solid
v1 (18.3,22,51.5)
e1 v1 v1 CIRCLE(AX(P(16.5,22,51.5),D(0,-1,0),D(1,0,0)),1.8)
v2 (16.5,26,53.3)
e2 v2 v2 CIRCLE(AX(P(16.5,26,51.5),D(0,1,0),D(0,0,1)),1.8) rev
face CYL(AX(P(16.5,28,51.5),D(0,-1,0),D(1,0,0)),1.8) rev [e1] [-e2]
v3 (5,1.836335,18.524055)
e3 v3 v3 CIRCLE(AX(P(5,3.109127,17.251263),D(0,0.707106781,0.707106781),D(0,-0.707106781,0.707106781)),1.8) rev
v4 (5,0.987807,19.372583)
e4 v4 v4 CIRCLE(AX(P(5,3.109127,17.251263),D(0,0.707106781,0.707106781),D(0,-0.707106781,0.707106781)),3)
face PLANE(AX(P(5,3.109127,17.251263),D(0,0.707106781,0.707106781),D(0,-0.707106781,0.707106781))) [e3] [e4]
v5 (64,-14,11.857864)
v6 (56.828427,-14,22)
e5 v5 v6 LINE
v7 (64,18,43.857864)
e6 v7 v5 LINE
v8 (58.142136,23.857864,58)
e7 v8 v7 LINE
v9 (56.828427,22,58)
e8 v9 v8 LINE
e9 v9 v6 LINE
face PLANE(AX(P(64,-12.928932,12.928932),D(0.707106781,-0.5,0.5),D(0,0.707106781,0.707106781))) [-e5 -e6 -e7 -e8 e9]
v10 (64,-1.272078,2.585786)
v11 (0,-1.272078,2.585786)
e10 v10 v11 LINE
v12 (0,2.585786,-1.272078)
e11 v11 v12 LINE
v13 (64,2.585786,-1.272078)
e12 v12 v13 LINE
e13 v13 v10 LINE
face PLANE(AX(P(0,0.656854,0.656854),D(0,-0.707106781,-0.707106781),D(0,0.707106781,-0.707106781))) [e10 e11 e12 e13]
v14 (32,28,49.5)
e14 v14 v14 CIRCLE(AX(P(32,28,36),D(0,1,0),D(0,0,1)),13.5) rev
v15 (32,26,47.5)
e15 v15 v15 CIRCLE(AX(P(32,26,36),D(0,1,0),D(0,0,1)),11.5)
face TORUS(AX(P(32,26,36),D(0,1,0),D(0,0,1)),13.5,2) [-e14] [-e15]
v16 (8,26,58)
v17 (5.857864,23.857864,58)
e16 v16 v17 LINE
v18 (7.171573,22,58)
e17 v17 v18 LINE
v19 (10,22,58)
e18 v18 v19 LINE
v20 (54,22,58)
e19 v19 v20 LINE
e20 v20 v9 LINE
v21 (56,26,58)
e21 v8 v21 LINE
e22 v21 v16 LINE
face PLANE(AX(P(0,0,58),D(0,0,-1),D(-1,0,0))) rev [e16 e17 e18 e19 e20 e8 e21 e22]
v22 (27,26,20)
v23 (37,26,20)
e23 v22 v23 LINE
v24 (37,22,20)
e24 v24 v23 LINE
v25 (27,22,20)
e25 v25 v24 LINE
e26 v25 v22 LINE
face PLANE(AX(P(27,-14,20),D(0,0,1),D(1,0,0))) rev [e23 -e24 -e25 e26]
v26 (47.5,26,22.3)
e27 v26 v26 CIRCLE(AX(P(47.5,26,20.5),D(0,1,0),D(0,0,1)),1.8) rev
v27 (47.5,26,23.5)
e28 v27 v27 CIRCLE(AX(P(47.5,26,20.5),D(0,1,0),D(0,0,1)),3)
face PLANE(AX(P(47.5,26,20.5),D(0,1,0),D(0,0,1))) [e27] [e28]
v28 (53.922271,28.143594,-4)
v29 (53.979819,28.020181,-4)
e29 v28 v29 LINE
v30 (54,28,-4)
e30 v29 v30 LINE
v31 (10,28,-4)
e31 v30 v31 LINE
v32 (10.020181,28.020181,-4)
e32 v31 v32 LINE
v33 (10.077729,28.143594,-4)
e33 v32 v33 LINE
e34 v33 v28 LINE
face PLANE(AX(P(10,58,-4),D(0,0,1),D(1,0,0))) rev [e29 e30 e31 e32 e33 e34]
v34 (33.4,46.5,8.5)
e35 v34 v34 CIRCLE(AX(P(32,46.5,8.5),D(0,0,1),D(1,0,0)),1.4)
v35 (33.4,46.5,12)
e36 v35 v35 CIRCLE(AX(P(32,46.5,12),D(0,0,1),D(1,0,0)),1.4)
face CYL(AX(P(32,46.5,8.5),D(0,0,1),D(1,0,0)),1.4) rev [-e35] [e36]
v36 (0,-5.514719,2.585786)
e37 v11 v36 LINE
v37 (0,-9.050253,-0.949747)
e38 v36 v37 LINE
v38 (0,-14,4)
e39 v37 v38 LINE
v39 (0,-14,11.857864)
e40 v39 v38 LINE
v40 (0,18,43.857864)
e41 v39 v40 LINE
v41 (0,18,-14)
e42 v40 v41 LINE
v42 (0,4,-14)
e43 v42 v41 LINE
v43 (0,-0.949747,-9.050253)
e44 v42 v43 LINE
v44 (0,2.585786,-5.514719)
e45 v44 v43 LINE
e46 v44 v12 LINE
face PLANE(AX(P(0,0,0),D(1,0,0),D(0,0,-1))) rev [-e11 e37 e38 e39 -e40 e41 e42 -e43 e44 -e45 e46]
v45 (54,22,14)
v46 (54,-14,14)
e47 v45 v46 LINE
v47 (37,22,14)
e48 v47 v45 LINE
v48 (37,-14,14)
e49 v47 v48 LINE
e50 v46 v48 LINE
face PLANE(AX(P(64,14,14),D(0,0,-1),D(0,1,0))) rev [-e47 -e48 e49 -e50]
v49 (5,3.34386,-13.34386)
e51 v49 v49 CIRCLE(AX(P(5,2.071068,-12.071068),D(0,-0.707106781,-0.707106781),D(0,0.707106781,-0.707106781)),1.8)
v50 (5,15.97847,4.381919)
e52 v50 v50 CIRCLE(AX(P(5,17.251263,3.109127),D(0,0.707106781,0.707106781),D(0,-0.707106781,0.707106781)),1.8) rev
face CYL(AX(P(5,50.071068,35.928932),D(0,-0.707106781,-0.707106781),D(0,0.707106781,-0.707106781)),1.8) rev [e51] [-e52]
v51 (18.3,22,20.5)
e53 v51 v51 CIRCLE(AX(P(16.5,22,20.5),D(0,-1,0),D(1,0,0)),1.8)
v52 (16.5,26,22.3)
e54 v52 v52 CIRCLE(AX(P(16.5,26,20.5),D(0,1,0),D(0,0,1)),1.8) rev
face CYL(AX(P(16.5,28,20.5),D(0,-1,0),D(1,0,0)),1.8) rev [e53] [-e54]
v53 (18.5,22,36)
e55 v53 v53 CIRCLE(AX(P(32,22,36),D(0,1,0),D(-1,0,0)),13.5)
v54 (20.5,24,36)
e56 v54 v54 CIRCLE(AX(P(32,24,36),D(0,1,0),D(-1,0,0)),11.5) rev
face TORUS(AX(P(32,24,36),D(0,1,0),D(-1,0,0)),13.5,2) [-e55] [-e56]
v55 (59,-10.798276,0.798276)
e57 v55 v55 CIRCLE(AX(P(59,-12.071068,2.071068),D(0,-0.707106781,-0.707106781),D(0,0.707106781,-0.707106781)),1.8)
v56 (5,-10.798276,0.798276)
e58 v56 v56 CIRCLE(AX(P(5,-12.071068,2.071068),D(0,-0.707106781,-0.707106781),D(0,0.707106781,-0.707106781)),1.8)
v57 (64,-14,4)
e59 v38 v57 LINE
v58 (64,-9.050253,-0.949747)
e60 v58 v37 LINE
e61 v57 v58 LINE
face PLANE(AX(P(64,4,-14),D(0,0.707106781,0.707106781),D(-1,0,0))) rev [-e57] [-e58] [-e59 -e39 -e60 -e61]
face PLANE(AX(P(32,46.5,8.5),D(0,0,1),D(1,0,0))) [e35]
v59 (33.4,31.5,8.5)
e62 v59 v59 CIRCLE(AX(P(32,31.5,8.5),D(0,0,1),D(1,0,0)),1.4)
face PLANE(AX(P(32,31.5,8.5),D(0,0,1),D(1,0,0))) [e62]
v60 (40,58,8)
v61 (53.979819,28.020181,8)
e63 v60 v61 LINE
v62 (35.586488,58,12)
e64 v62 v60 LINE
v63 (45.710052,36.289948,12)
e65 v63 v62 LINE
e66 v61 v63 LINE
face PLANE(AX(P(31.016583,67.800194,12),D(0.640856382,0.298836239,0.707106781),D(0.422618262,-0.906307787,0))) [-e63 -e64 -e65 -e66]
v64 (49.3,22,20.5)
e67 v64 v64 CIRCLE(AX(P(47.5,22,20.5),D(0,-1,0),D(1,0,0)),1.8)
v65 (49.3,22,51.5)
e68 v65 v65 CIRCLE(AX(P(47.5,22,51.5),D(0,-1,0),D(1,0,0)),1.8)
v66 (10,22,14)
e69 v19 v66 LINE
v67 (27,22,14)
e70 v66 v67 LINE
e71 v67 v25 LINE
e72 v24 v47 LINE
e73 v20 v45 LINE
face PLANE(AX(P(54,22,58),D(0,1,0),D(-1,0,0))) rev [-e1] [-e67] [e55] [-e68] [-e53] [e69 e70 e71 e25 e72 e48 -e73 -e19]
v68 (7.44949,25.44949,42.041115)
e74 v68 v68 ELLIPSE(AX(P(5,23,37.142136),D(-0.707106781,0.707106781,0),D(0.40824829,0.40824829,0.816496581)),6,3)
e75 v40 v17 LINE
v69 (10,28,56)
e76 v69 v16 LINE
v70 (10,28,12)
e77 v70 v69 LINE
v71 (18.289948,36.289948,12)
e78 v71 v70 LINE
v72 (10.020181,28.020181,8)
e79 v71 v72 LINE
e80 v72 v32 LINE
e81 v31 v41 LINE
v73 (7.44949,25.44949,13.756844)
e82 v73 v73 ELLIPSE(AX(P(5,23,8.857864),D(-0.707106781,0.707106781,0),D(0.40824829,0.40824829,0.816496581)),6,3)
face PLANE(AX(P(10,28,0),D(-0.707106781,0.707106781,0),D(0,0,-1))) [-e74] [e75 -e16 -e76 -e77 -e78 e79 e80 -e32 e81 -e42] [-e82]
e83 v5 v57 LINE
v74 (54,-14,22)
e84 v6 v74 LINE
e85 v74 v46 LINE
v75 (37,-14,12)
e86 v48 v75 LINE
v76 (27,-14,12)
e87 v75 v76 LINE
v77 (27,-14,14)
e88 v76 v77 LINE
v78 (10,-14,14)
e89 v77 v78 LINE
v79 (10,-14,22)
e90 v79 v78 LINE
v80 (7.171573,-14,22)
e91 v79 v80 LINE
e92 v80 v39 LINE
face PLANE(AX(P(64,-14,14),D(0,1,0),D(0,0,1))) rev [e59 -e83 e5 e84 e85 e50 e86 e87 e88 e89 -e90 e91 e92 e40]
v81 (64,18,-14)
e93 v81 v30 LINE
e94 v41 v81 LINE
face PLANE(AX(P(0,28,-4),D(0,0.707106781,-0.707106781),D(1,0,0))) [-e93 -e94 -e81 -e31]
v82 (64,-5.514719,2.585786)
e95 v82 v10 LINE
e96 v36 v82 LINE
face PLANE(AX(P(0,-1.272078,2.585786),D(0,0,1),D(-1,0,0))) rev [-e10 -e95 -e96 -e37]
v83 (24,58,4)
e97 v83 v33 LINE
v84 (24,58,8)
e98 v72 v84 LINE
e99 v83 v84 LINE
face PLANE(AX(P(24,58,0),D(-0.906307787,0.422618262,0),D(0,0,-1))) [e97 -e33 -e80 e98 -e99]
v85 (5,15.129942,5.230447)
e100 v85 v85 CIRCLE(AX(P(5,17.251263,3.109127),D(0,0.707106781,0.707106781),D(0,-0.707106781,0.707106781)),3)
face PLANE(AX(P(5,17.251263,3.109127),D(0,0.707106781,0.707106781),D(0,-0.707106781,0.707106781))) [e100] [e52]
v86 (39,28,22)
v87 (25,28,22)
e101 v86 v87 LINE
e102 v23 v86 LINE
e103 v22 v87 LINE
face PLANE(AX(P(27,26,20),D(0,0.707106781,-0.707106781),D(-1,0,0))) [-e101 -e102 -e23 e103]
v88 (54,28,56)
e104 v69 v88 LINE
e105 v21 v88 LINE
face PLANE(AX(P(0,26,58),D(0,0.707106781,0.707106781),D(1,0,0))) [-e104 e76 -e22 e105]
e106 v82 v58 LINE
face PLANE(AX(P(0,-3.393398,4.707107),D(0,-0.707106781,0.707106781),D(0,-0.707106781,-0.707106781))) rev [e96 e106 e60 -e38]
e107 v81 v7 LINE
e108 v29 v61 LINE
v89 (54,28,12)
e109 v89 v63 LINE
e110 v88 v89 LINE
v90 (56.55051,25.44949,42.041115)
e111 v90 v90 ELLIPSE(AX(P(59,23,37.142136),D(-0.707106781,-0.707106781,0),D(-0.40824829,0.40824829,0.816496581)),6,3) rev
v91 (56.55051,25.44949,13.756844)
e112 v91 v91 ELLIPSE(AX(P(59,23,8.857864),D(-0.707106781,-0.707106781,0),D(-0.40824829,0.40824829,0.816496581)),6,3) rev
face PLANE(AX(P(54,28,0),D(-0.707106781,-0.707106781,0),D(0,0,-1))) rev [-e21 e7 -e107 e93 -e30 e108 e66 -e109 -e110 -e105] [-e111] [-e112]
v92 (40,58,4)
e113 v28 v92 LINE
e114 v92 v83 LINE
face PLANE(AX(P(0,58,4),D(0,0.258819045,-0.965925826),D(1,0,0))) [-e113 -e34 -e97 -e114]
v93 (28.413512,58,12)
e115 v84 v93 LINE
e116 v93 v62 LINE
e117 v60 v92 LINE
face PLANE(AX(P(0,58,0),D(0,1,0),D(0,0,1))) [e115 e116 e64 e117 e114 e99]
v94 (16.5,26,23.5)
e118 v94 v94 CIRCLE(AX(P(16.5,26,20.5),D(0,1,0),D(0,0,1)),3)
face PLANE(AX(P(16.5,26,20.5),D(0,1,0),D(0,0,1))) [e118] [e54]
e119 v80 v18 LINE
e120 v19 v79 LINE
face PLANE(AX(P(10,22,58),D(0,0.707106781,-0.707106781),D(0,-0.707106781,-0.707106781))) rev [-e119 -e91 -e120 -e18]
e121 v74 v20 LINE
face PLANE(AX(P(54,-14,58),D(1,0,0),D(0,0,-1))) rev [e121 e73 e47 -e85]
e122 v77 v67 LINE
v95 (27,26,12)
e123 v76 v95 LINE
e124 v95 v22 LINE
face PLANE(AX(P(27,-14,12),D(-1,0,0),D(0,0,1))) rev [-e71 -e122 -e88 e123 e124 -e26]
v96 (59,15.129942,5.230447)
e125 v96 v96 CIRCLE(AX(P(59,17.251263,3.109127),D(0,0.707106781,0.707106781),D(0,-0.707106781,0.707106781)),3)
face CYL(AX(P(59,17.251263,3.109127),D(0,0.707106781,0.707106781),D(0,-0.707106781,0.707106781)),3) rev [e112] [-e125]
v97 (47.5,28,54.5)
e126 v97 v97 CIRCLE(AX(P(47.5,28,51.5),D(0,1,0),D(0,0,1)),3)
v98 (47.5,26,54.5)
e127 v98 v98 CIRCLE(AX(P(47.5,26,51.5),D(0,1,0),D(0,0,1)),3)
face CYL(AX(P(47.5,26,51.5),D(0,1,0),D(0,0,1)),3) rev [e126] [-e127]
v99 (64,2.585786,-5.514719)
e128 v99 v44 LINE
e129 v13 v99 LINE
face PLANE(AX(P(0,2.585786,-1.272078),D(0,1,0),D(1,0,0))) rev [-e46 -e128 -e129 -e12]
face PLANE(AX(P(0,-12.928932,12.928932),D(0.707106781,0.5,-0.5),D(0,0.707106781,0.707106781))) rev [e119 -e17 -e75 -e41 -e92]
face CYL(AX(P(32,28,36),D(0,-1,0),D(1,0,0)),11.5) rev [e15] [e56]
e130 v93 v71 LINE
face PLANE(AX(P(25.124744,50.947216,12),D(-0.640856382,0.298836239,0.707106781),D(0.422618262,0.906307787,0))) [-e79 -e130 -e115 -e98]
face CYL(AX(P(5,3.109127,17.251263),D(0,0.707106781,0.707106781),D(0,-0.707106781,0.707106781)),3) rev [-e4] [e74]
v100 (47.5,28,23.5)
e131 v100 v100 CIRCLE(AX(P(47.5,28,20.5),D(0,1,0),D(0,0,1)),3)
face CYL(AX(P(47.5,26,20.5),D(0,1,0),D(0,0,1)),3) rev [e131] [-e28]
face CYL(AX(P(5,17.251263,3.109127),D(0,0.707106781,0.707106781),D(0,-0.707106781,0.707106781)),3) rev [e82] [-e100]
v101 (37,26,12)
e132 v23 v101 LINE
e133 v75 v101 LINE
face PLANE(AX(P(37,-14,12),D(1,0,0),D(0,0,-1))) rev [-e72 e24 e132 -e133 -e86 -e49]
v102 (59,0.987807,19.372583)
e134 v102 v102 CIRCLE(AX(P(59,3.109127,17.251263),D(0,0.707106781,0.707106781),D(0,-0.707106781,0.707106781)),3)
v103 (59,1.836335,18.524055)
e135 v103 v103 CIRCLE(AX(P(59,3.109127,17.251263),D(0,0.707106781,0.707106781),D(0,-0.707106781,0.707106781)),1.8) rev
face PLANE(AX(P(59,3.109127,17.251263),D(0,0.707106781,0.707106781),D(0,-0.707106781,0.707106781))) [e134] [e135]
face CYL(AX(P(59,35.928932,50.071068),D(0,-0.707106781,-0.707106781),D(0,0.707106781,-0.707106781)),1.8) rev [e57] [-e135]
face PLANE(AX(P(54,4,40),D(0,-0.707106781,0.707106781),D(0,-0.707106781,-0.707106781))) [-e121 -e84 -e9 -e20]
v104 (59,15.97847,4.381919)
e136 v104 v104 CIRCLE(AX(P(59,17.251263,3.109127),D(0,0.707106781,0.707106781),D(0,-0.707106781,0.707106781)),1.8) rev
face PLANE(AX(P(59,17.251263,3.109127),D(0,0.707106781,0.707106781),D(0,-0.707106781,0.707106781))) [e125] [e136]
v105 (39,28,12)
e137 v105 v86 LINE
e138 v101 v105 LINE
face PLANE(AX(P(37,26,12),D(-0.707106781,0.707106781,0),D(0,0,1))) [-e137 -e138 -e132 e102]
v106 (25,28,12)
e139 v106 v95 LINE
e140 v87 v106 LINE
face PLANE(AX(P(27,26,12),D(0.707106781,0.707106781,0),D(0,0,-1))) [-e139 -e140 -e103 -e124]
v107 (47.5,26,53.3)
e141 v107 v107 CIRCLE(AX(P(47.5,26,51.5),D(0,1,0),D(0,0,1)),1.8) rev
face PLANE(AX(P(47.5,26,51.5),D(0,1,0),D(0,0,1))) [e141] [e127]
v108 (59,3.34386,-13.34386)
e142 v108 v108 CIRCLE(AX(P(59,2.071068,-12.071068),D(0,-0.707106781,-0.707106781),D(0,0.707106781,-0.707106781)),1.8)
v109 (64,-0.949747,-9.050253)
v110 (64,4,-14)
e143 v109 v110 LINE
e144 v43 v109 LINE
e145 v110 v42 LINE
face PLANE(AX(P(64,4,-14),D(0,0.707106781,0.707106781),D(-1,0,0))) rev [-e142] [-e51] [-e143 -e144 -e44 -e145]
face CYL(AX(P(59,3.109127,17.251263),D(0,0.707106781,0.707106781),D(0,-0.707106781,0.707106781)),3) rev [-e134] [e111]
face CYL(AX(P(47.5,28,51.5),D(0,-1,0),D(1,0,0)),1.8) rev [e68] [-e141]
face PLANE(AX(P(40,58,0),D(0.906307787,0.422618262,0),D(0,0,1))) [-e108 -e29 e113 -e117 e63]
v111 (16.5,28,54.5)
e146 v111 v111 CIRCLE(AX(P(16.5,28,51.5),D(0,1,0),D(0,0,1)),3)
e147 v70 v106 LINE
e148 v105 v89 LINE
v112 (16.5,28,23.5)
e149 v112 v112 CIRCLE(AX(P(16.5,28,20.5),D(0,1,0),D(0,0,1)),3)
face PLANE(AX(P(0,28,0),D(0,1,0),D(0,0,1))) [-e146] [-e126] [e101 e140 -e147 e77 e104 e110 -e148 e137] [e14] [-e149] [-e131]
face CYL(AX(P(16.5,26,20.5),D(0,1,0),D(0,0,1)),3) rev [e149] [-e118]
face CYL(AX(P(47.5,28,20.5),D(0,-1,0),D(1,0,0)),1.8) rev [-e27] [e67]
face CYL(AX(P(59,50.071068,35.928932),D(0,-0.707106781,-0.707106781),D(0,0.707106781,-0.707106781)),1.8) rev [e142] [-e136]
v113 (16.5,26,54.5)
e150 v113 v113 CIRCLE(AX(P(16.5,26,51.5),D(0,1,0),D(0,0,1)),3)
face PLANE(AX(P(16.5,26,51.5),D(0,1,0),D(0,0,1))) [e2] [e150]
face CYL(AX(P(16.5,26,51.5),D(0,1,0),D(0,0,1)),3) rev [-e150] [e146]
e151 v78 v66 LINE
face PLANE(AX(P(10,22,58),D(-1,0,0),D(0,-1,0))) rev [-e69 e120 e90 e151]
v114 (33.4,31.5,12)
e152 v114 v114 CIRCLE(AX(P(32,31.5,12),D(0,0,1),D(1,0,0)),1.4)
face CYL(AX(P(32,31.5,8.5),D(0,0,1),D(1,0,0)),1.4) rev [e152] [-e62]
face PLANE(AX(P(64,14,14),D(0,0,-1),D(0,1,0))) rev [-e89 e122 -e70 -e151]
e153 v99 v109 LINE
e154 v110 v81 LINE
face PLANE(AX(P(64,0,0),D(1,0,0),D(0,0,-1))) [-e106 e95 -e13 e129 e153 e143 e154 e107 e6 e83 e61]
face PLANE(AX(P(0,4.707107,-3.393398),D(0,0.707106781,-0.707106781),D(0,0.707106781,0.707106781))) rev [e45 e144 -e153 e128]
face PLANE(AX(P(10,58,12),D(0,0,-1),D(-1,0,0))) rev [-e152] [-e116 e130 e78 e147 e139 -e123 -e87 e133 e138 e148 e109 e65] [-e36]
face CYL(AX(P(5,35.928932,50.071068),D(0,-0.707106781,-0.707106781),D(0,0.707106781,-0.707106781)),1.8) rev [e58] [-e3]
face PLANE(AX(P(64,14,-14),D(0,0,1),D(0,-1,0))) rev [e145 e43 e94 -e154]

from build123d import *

# Parameters (mm, degrees)
SKETCH1_W           = 28
SKETCH1_H           = 28
BOSS_EXTRUDE1_DEPTH = 64
CHAMFER1_SIZE       = 18
SKETCH3_W           = 64
SKETCH3_H           = 28
BOSS_EXTRUDE2_DEPTH = 14
BOSS_EXTRUDE3_DEPTH = 44
CHAMFER2_SIZE       = 32
SKETCH5_R           = 11.5
SKETCH5_R_2         = 1.8
CUT_EXTRUDE1_DEPTH  = 6
CHAMFER3_SIZE       = 2
SKETCH2_R           = 1.8
CUT_EXTRUDE2_DEPTH  = 96.676538399
SKETCH6_R           = 3
CUT_EXTRUDE3_DEPTH  = 45
SKETCH7_R           = 3
CUT_EXTRUDE4_DEPTH  = 2
FILLET1_R           = 2
CHAMFER4_SIZE       = 10
CHAMFER5_SIZE       = 10
CHAMFER6_START      = -29
CHAMFER6_OUTLINE_W  = 4
CHAMFER6_OUTLINE_H  = 54
CHAMFER6_DEPTH      = 3.544155877
CHAMFER7_SIZE       = 10
SKETCH8_W           = 44
SKETCH8_H           = 16
BOSS_EXTRUDE4_DEPTH = 30
SKETCH9_R           = 1.4
CUT_EXTRUDE5_DEPTH  = 3.5
CHAMFER8_SIZE       = 14
CHAMFER8_SIZE_2     = 30.023096887
CHAMFER9_SIZE       = 8
CHAMFER9_SIZE2      = 29.856406461
CHAMFER10_SIZE      = 4
SKETCH11_W          = 10
SKETCH11_H          = 8
CUT_EXTRUDE6_DEPTH  = 97.041657628
CHAMFER11_SIZE      = 2
SKETCH12_W          = 64
SKETCH12_H          = 11.455844122
CUT_EXTRUDE7_DEPTH  = 8
CHAMFER12_SIZE      = 3


with BuildPart() as part:
    # Sketch1 → Boss-Extrude1 (new body)
    with BuildSketch(Plane(origin=(0, 0, 0), x_dir=(0, 0, -1), z_dir=(1, 0, 0))):
        Rectangle(SKETCH1_W, SKETCH1_H)
    extrude(amount=BOSS_EXTRUDE1_DEPTH)

    # Chamfer1
    chamfer1_edges = [part.edges().sort_by_distance(p)[0] for p in [
        (32, -14, -14),
    ]]
    chamfer(chamfer1_edges, length=CHAMFER1_SIZE)

    # Sketch3 → Boss-Extrude2 (add)
    with BuildSketch(Plane(origin=(0, 14, 0), x_dir=(1, 0, 0), z_dir=(0, 1, 0))):
        with Locations((32, 0)):
            Rectangle(SKETCH3_W, SKETCH3_H)
    extrude(amount=BOSS_EXTRUDE2_DEPTH)

    # Sketch4 → Boss-Extrude3 (add)
    with BuildSketch(Plane.XY.offset(14)):
        Polygon((0, -14), (0, 28), (64, 28), (64, -14), (54, -14), (54, 22), (10, 22), (10, -14), align=None)
    extrude(amount=BOSS_EXTRUDE3_DEPTH)

    # Chamfer2
    chamfer2_edges = [part.edges().sort_by_distance(p)[0] for p in [
        (5, -14, 58),
        (59, -14, 58),
    ]]
    chamfer(chamfer2_edges, length=CHAMFER2_SIZE)

    # Sketch5 → Cut-Extrude1 (cut)
    with BuildSketch(Plane(origin=(0, 22, 0), x_dir=(-1, 0, 0), z_dir=(0, -1, 0))):
        with Locations(Location((-32, -36, 0), (0, 0, 180))):
            Circle(SKETCH5_R)
        with Locations(Location((-16.5, -51.5, 0), (0, 0, 180))):
            Circle(SKETCH5_R_2)
        with Locations(Location((-47.5, -51.5, 0), (0, 0, 180))):
            Circle(SKETCH5_R_2)
        with Locations(Location((-47.5, -20.5, 0), (0, 0, 180))):
            Circle(SKETCH5_R_2)
        with Locations(Location((-16.5, -20.5, 0), (0, 0, 180))):
            Circle(SKETCH5_R_2)
    extrude(amount=-CUT_EXTRUDE1_DEPTH, mode=Mode.SUBTRACT)

    # Chamfer3
    chamfer3_edges = [part.edges().sort_by_distance(p)[0] for p in [
        (32, 28, 58),
    ]]
    chamfer(chamfer3_edges, length=CHAMFER3_SIZE)

    # Sketch2 → Cut-Extrude2 (cut, through all)
    with BuildSketch(Plane(origin=(0, -5, -5), x_dir=(-1, 0, 0), z_dir=(0, -0.7071067811865488, -0.7071067811865464))):
        with Locations(Location((-5, -10, 0), (0, 0, 90))):
            Circle(SKETCH2_R)
        with Locations(Location((-59, -10, 0), (0, 0, 90))):
            Circle(SKETCH2_R)
        with Locations(Location((-59, 10, 0), (0, 0, 90))):
            Circle(SKETCH2_R)
        with Locations(Location((-5, 10, 0), (0, 0, 90))):
            Circle(SKETCH2_R)
    extrude(amount=-CUT_EXTRUDE2_DEPTH, mode=Mode.SUBTRACT)

    # Sketch6 → Cut-Extrude3 (cut)
    with BuildSketch(Plane(origin=(0, 42, 42), x_dir=(1, 0, 0), z_dir=(0, 0.7071067811865477, 0.7071067811865475))):
        with Locations(Location((5, -10, 0), (0, 0, 270))):
            Circle(SKETCH6_R)
        with Locations(Location((5, 10, 0), (0, 0, 270))):
            Circle(SKETCH6_R)
        with Locations(Location((59, 10, 0), (0, 0, 270))):
            Circle(SKETCH6_R)
        with Locations(Location((59, -10, 0), (0, 0, 270))):
            Circle(SKETCH6_R)
    extrude(amount=-CUT_EXTRUDE3_DEPTH, mode=Mode.SUBTRACT)

    # Sketch7 → Cut-Extrude4 (cut)
    with BuildSketch(Plane(origin=(0, 28, 0), x_dir=(1, 0, 0), z_dir=(0, 1, 0))):
        with Locations(Location((16.5, -20.5, 0), (0, 0, 270))):
            Circle(SKETCH7_R)
        with Locations(Location((47.5, -20.5, 0), (0, 0, 270))):
            Circle(SKETCH7_R)
        with Locations(Location((47.5, -51.5, 0), (0, 0, 270))):
            Circle(SKETCH7_R)
        with Locations(Location((16.5, -51.5, 0), (0, 0, 270))):
            Circle(SKETCH7_R)
    extrude(amount=-CUT_EXTRUDE4_DEPTH, mode=Mode.SUBTRACT)

    # Fillet1
    fillet1_edges = [part.edges().sort_by_distance(p)[0] for p in [
        (20.5, 28, 36),
        (20.5, 22, 36),
    ]]
    fillet(fillet1_edges, radius=FILLET1_R)

    # Chamfer4
    # the kernel refuses this chamfer: 10 mm, written as the material it takes off along each edge
    with BuildSketch(Plane(origin=(64, 28, 81.71682988), x_dir=(-1, 0, 0), z_dir=(0, 0, -1))) as chamfer4_piece_1:
        Polygon((CHAMFER4_SIZE, 0), (0, -CHAMFER4_SIZE), (0, 0), align=None)
    extrude(amount=121.433659759, mode=Mode.SUBTRACT)
    with BuildSketch(Plane(origin=(0, 28, 81.71682988), x_dir=(1, 0, 0), z_dir=(0, 0, -1))) as chamfer4_piece_2:
        Polygon((CHAMFER4_SIZE, 0), (0, CHAMFER4_SIZE), (0, 0), align=None)
    extrude(amount=121.433659759, mode=Mode.SUBTRACT)

    # Chamfer5
    chamfer5_edges = [part.edges().sort_by_distance(p)[0] for p in [
        (64, 2, 42),
        (0, 2, 42),
    ]]
    chamfer(chamfer5_edges, length=CHAMFER5_SIZE - 0.0001)  # a hair under: the kernel refuses the full size

    # Chamfer6: read off the stored shape, not the designer's step
    # Chamfer6 outline → Chamfer6 (cut)
    with BuildSketch(Plane(origin=(0, 0, 0), x_dir=(1, 0, 0), z_dir=(0, 0.707106781186549, -0.707106781186546)).offset(CHAMFER6_START)):
        with Locations((8, -31)):
            Rectangle(CHAMFER6_OUTLINE_W, CHAMFER6_OUTLINE_H)
        with Locations((56, -31)):
            Rectangle(CHAMFER6_OUTLINE_W, CHAMFER6_OUTLINE_H)
    extrude(amount=CHAMFER6_DEPTH, mode=Mode.SUBTRACT)

    # Chamfer7
    chamfer7_edges = [part.edges().sort_by_distance(p)[0] for p in [
        (32, 28, -14),
    ]]
    chamfer(chamfer7_edges, length=CHAMFER7_SIZE)

    # Sketch8 → Boss-Extrude4 (add)
    with BuildSketch(Plane(origin=(0, 28, 0), x_dir=(1, 0, 0), z_dir=(0, 1, 0))):
        with Locations((32, -4)):
            Rectangle(SKETCH8_W, SKETCH8_H)
    extrude(amount=BOSS_EXTRUDE4_DEPTH)

    # Sketch9 → Cut-Extrude5 (cut)
    with BuildSketch(Plane.XY.offset(12)):
        with Locations((32, 31.5)):
            Circle(SKETCH9_R)
        with Locations((32, 46.5)):
            Circle(SKETCH9_R)
    extrude(amount=-CUT_EXTRUDE5_DEPTH, mode=Mode.SUBTRACT)

    # Chamfer8
    # the kernel refuses this chamfer: 30.023096887, 14 mm, written as the material it takes off along each edge
    with BuildSketch(Plane(origin=(54, 58, -81.789107611), x_dir=(-1, 0, 0), z_dir=(0, 0, 1))) as chamfer8_piece_1_section:
        Polygon((CHAMFER8_SIZE, 0), (0, CHAMFER8_SIZE_2), (0, 0), align=None)
    chamfer8_piece_1 = extrude(amount=171.578215221, mode=Mode.PRIVATE)
    chamfer8_piece_1 = split(chamfer8_piece_1, bisect_by=Plane(origin=(39, 43, -81.789107611), z_dir=(0.7071067811865476, 0.7071067811865476, 0)), keep=Keep.TOP, mode=Mode.PRIVATE)
    add(chamfer8_piece_1, mode=Mode.SUBTRACT)
    with BuildSketch(Plane(origin=(10, 58, 89.789107611), x_dir=(0, -1, 0), z_dir=(0, 0, -1))) as chamfer8_piece_2_section:
        Polygon((CHAMFER8_SIZE_2, 0), (0, -CHAMFER8_SIZE), (0, 0), align=None)
    chamfer8_piece_2 = extrude(amount=171.578215221, mode=Mode.PRIVATE)
    chamfer8_piece_2 = split(chamfer8_piece_2, bisect_by=Plane(origin=(25, 43, 89.789107611), z_dir=(-0.7071067811865476, 0.7071067811865476, 0)), keep=Keep.TOP, mode=Mode.PRIVATE)
    add(chamfer8_piece_2, mode=Mode.SUBTRACT)

    # Chamfer9
    chamfer9_edges = [part.edges().sort_by_distance(p)[0] for p in [
        (32, 58, -4),
    ]]
    chamfer9_side = [part.faces().sort_by_distance(p)[0] for p in [
        (32, 58, 4),
    ]]
    chamfer(chamfer9_edges, length=CHAMFER9_SIZE, length2=CHAMFER9_SIZE2, reference=chamfer9_side[0])

    # Chamfer10
    chamfer10_edges = [part.edges().sort_by_distance(p)[0] for p in [
        (17.010090322, 43.010090322, 12),
        (46.989909678, 43.010090322, 12),
    ]]
    chamfer(chamfer10_edges, length=CHAMFER10_SIZE)

    # Sketch11 → Cut-Extrude6 (cut, through all)
    with BuildSketch(Plane(origin=(0, 28, 0), x_dir=(1, 0, 0), z_dir=(0, 1, 0))):
        with Locations((32, -16)):
            Rectangle(SKETCH11_W, SKETCH11_H)
    extrude(amount=-CUT_EXTRUDE6_DEPTH, mode=Mode.SUBTRACT)

    # Chamfer11
    chamfer11_edges = [part.edges().sort_by_distance(p)[0] for p in [
        (27, 28, 16),
        (32, 28, 20),
        (37, 28, 16),
    ]]
    chamfer(chamfer11_edges, length=CHAMFER11_SIZE)

    # Sketch12 → Cut-Extrude7 (cut)
    with BuildSketch(Plane(origin=(0, -5, -5), x_dir=(-1, 0, 0), z_dir=(0, -0.7071067811865488, -0.7071067811865464))):
        with Locations((-32, 0)):
            Rectangle(SKETCH12_W, SKETCH12_H)
    extrude(amount=-CUT_EXTRUDE7_DEPTH, mode=Mode.SUBTRACT)

    # Chamfer12
    chamfer12_edges = [part.edges().sort_by_distance(p)[0] for p in [
        (32, -3.393398282, 4.707106781),
        (32, 4.707106781, -3.393398282),
    ]]
    chamfer(chamfer12_edges, length=CHAMFER12_SIZE)


solid = part.part
